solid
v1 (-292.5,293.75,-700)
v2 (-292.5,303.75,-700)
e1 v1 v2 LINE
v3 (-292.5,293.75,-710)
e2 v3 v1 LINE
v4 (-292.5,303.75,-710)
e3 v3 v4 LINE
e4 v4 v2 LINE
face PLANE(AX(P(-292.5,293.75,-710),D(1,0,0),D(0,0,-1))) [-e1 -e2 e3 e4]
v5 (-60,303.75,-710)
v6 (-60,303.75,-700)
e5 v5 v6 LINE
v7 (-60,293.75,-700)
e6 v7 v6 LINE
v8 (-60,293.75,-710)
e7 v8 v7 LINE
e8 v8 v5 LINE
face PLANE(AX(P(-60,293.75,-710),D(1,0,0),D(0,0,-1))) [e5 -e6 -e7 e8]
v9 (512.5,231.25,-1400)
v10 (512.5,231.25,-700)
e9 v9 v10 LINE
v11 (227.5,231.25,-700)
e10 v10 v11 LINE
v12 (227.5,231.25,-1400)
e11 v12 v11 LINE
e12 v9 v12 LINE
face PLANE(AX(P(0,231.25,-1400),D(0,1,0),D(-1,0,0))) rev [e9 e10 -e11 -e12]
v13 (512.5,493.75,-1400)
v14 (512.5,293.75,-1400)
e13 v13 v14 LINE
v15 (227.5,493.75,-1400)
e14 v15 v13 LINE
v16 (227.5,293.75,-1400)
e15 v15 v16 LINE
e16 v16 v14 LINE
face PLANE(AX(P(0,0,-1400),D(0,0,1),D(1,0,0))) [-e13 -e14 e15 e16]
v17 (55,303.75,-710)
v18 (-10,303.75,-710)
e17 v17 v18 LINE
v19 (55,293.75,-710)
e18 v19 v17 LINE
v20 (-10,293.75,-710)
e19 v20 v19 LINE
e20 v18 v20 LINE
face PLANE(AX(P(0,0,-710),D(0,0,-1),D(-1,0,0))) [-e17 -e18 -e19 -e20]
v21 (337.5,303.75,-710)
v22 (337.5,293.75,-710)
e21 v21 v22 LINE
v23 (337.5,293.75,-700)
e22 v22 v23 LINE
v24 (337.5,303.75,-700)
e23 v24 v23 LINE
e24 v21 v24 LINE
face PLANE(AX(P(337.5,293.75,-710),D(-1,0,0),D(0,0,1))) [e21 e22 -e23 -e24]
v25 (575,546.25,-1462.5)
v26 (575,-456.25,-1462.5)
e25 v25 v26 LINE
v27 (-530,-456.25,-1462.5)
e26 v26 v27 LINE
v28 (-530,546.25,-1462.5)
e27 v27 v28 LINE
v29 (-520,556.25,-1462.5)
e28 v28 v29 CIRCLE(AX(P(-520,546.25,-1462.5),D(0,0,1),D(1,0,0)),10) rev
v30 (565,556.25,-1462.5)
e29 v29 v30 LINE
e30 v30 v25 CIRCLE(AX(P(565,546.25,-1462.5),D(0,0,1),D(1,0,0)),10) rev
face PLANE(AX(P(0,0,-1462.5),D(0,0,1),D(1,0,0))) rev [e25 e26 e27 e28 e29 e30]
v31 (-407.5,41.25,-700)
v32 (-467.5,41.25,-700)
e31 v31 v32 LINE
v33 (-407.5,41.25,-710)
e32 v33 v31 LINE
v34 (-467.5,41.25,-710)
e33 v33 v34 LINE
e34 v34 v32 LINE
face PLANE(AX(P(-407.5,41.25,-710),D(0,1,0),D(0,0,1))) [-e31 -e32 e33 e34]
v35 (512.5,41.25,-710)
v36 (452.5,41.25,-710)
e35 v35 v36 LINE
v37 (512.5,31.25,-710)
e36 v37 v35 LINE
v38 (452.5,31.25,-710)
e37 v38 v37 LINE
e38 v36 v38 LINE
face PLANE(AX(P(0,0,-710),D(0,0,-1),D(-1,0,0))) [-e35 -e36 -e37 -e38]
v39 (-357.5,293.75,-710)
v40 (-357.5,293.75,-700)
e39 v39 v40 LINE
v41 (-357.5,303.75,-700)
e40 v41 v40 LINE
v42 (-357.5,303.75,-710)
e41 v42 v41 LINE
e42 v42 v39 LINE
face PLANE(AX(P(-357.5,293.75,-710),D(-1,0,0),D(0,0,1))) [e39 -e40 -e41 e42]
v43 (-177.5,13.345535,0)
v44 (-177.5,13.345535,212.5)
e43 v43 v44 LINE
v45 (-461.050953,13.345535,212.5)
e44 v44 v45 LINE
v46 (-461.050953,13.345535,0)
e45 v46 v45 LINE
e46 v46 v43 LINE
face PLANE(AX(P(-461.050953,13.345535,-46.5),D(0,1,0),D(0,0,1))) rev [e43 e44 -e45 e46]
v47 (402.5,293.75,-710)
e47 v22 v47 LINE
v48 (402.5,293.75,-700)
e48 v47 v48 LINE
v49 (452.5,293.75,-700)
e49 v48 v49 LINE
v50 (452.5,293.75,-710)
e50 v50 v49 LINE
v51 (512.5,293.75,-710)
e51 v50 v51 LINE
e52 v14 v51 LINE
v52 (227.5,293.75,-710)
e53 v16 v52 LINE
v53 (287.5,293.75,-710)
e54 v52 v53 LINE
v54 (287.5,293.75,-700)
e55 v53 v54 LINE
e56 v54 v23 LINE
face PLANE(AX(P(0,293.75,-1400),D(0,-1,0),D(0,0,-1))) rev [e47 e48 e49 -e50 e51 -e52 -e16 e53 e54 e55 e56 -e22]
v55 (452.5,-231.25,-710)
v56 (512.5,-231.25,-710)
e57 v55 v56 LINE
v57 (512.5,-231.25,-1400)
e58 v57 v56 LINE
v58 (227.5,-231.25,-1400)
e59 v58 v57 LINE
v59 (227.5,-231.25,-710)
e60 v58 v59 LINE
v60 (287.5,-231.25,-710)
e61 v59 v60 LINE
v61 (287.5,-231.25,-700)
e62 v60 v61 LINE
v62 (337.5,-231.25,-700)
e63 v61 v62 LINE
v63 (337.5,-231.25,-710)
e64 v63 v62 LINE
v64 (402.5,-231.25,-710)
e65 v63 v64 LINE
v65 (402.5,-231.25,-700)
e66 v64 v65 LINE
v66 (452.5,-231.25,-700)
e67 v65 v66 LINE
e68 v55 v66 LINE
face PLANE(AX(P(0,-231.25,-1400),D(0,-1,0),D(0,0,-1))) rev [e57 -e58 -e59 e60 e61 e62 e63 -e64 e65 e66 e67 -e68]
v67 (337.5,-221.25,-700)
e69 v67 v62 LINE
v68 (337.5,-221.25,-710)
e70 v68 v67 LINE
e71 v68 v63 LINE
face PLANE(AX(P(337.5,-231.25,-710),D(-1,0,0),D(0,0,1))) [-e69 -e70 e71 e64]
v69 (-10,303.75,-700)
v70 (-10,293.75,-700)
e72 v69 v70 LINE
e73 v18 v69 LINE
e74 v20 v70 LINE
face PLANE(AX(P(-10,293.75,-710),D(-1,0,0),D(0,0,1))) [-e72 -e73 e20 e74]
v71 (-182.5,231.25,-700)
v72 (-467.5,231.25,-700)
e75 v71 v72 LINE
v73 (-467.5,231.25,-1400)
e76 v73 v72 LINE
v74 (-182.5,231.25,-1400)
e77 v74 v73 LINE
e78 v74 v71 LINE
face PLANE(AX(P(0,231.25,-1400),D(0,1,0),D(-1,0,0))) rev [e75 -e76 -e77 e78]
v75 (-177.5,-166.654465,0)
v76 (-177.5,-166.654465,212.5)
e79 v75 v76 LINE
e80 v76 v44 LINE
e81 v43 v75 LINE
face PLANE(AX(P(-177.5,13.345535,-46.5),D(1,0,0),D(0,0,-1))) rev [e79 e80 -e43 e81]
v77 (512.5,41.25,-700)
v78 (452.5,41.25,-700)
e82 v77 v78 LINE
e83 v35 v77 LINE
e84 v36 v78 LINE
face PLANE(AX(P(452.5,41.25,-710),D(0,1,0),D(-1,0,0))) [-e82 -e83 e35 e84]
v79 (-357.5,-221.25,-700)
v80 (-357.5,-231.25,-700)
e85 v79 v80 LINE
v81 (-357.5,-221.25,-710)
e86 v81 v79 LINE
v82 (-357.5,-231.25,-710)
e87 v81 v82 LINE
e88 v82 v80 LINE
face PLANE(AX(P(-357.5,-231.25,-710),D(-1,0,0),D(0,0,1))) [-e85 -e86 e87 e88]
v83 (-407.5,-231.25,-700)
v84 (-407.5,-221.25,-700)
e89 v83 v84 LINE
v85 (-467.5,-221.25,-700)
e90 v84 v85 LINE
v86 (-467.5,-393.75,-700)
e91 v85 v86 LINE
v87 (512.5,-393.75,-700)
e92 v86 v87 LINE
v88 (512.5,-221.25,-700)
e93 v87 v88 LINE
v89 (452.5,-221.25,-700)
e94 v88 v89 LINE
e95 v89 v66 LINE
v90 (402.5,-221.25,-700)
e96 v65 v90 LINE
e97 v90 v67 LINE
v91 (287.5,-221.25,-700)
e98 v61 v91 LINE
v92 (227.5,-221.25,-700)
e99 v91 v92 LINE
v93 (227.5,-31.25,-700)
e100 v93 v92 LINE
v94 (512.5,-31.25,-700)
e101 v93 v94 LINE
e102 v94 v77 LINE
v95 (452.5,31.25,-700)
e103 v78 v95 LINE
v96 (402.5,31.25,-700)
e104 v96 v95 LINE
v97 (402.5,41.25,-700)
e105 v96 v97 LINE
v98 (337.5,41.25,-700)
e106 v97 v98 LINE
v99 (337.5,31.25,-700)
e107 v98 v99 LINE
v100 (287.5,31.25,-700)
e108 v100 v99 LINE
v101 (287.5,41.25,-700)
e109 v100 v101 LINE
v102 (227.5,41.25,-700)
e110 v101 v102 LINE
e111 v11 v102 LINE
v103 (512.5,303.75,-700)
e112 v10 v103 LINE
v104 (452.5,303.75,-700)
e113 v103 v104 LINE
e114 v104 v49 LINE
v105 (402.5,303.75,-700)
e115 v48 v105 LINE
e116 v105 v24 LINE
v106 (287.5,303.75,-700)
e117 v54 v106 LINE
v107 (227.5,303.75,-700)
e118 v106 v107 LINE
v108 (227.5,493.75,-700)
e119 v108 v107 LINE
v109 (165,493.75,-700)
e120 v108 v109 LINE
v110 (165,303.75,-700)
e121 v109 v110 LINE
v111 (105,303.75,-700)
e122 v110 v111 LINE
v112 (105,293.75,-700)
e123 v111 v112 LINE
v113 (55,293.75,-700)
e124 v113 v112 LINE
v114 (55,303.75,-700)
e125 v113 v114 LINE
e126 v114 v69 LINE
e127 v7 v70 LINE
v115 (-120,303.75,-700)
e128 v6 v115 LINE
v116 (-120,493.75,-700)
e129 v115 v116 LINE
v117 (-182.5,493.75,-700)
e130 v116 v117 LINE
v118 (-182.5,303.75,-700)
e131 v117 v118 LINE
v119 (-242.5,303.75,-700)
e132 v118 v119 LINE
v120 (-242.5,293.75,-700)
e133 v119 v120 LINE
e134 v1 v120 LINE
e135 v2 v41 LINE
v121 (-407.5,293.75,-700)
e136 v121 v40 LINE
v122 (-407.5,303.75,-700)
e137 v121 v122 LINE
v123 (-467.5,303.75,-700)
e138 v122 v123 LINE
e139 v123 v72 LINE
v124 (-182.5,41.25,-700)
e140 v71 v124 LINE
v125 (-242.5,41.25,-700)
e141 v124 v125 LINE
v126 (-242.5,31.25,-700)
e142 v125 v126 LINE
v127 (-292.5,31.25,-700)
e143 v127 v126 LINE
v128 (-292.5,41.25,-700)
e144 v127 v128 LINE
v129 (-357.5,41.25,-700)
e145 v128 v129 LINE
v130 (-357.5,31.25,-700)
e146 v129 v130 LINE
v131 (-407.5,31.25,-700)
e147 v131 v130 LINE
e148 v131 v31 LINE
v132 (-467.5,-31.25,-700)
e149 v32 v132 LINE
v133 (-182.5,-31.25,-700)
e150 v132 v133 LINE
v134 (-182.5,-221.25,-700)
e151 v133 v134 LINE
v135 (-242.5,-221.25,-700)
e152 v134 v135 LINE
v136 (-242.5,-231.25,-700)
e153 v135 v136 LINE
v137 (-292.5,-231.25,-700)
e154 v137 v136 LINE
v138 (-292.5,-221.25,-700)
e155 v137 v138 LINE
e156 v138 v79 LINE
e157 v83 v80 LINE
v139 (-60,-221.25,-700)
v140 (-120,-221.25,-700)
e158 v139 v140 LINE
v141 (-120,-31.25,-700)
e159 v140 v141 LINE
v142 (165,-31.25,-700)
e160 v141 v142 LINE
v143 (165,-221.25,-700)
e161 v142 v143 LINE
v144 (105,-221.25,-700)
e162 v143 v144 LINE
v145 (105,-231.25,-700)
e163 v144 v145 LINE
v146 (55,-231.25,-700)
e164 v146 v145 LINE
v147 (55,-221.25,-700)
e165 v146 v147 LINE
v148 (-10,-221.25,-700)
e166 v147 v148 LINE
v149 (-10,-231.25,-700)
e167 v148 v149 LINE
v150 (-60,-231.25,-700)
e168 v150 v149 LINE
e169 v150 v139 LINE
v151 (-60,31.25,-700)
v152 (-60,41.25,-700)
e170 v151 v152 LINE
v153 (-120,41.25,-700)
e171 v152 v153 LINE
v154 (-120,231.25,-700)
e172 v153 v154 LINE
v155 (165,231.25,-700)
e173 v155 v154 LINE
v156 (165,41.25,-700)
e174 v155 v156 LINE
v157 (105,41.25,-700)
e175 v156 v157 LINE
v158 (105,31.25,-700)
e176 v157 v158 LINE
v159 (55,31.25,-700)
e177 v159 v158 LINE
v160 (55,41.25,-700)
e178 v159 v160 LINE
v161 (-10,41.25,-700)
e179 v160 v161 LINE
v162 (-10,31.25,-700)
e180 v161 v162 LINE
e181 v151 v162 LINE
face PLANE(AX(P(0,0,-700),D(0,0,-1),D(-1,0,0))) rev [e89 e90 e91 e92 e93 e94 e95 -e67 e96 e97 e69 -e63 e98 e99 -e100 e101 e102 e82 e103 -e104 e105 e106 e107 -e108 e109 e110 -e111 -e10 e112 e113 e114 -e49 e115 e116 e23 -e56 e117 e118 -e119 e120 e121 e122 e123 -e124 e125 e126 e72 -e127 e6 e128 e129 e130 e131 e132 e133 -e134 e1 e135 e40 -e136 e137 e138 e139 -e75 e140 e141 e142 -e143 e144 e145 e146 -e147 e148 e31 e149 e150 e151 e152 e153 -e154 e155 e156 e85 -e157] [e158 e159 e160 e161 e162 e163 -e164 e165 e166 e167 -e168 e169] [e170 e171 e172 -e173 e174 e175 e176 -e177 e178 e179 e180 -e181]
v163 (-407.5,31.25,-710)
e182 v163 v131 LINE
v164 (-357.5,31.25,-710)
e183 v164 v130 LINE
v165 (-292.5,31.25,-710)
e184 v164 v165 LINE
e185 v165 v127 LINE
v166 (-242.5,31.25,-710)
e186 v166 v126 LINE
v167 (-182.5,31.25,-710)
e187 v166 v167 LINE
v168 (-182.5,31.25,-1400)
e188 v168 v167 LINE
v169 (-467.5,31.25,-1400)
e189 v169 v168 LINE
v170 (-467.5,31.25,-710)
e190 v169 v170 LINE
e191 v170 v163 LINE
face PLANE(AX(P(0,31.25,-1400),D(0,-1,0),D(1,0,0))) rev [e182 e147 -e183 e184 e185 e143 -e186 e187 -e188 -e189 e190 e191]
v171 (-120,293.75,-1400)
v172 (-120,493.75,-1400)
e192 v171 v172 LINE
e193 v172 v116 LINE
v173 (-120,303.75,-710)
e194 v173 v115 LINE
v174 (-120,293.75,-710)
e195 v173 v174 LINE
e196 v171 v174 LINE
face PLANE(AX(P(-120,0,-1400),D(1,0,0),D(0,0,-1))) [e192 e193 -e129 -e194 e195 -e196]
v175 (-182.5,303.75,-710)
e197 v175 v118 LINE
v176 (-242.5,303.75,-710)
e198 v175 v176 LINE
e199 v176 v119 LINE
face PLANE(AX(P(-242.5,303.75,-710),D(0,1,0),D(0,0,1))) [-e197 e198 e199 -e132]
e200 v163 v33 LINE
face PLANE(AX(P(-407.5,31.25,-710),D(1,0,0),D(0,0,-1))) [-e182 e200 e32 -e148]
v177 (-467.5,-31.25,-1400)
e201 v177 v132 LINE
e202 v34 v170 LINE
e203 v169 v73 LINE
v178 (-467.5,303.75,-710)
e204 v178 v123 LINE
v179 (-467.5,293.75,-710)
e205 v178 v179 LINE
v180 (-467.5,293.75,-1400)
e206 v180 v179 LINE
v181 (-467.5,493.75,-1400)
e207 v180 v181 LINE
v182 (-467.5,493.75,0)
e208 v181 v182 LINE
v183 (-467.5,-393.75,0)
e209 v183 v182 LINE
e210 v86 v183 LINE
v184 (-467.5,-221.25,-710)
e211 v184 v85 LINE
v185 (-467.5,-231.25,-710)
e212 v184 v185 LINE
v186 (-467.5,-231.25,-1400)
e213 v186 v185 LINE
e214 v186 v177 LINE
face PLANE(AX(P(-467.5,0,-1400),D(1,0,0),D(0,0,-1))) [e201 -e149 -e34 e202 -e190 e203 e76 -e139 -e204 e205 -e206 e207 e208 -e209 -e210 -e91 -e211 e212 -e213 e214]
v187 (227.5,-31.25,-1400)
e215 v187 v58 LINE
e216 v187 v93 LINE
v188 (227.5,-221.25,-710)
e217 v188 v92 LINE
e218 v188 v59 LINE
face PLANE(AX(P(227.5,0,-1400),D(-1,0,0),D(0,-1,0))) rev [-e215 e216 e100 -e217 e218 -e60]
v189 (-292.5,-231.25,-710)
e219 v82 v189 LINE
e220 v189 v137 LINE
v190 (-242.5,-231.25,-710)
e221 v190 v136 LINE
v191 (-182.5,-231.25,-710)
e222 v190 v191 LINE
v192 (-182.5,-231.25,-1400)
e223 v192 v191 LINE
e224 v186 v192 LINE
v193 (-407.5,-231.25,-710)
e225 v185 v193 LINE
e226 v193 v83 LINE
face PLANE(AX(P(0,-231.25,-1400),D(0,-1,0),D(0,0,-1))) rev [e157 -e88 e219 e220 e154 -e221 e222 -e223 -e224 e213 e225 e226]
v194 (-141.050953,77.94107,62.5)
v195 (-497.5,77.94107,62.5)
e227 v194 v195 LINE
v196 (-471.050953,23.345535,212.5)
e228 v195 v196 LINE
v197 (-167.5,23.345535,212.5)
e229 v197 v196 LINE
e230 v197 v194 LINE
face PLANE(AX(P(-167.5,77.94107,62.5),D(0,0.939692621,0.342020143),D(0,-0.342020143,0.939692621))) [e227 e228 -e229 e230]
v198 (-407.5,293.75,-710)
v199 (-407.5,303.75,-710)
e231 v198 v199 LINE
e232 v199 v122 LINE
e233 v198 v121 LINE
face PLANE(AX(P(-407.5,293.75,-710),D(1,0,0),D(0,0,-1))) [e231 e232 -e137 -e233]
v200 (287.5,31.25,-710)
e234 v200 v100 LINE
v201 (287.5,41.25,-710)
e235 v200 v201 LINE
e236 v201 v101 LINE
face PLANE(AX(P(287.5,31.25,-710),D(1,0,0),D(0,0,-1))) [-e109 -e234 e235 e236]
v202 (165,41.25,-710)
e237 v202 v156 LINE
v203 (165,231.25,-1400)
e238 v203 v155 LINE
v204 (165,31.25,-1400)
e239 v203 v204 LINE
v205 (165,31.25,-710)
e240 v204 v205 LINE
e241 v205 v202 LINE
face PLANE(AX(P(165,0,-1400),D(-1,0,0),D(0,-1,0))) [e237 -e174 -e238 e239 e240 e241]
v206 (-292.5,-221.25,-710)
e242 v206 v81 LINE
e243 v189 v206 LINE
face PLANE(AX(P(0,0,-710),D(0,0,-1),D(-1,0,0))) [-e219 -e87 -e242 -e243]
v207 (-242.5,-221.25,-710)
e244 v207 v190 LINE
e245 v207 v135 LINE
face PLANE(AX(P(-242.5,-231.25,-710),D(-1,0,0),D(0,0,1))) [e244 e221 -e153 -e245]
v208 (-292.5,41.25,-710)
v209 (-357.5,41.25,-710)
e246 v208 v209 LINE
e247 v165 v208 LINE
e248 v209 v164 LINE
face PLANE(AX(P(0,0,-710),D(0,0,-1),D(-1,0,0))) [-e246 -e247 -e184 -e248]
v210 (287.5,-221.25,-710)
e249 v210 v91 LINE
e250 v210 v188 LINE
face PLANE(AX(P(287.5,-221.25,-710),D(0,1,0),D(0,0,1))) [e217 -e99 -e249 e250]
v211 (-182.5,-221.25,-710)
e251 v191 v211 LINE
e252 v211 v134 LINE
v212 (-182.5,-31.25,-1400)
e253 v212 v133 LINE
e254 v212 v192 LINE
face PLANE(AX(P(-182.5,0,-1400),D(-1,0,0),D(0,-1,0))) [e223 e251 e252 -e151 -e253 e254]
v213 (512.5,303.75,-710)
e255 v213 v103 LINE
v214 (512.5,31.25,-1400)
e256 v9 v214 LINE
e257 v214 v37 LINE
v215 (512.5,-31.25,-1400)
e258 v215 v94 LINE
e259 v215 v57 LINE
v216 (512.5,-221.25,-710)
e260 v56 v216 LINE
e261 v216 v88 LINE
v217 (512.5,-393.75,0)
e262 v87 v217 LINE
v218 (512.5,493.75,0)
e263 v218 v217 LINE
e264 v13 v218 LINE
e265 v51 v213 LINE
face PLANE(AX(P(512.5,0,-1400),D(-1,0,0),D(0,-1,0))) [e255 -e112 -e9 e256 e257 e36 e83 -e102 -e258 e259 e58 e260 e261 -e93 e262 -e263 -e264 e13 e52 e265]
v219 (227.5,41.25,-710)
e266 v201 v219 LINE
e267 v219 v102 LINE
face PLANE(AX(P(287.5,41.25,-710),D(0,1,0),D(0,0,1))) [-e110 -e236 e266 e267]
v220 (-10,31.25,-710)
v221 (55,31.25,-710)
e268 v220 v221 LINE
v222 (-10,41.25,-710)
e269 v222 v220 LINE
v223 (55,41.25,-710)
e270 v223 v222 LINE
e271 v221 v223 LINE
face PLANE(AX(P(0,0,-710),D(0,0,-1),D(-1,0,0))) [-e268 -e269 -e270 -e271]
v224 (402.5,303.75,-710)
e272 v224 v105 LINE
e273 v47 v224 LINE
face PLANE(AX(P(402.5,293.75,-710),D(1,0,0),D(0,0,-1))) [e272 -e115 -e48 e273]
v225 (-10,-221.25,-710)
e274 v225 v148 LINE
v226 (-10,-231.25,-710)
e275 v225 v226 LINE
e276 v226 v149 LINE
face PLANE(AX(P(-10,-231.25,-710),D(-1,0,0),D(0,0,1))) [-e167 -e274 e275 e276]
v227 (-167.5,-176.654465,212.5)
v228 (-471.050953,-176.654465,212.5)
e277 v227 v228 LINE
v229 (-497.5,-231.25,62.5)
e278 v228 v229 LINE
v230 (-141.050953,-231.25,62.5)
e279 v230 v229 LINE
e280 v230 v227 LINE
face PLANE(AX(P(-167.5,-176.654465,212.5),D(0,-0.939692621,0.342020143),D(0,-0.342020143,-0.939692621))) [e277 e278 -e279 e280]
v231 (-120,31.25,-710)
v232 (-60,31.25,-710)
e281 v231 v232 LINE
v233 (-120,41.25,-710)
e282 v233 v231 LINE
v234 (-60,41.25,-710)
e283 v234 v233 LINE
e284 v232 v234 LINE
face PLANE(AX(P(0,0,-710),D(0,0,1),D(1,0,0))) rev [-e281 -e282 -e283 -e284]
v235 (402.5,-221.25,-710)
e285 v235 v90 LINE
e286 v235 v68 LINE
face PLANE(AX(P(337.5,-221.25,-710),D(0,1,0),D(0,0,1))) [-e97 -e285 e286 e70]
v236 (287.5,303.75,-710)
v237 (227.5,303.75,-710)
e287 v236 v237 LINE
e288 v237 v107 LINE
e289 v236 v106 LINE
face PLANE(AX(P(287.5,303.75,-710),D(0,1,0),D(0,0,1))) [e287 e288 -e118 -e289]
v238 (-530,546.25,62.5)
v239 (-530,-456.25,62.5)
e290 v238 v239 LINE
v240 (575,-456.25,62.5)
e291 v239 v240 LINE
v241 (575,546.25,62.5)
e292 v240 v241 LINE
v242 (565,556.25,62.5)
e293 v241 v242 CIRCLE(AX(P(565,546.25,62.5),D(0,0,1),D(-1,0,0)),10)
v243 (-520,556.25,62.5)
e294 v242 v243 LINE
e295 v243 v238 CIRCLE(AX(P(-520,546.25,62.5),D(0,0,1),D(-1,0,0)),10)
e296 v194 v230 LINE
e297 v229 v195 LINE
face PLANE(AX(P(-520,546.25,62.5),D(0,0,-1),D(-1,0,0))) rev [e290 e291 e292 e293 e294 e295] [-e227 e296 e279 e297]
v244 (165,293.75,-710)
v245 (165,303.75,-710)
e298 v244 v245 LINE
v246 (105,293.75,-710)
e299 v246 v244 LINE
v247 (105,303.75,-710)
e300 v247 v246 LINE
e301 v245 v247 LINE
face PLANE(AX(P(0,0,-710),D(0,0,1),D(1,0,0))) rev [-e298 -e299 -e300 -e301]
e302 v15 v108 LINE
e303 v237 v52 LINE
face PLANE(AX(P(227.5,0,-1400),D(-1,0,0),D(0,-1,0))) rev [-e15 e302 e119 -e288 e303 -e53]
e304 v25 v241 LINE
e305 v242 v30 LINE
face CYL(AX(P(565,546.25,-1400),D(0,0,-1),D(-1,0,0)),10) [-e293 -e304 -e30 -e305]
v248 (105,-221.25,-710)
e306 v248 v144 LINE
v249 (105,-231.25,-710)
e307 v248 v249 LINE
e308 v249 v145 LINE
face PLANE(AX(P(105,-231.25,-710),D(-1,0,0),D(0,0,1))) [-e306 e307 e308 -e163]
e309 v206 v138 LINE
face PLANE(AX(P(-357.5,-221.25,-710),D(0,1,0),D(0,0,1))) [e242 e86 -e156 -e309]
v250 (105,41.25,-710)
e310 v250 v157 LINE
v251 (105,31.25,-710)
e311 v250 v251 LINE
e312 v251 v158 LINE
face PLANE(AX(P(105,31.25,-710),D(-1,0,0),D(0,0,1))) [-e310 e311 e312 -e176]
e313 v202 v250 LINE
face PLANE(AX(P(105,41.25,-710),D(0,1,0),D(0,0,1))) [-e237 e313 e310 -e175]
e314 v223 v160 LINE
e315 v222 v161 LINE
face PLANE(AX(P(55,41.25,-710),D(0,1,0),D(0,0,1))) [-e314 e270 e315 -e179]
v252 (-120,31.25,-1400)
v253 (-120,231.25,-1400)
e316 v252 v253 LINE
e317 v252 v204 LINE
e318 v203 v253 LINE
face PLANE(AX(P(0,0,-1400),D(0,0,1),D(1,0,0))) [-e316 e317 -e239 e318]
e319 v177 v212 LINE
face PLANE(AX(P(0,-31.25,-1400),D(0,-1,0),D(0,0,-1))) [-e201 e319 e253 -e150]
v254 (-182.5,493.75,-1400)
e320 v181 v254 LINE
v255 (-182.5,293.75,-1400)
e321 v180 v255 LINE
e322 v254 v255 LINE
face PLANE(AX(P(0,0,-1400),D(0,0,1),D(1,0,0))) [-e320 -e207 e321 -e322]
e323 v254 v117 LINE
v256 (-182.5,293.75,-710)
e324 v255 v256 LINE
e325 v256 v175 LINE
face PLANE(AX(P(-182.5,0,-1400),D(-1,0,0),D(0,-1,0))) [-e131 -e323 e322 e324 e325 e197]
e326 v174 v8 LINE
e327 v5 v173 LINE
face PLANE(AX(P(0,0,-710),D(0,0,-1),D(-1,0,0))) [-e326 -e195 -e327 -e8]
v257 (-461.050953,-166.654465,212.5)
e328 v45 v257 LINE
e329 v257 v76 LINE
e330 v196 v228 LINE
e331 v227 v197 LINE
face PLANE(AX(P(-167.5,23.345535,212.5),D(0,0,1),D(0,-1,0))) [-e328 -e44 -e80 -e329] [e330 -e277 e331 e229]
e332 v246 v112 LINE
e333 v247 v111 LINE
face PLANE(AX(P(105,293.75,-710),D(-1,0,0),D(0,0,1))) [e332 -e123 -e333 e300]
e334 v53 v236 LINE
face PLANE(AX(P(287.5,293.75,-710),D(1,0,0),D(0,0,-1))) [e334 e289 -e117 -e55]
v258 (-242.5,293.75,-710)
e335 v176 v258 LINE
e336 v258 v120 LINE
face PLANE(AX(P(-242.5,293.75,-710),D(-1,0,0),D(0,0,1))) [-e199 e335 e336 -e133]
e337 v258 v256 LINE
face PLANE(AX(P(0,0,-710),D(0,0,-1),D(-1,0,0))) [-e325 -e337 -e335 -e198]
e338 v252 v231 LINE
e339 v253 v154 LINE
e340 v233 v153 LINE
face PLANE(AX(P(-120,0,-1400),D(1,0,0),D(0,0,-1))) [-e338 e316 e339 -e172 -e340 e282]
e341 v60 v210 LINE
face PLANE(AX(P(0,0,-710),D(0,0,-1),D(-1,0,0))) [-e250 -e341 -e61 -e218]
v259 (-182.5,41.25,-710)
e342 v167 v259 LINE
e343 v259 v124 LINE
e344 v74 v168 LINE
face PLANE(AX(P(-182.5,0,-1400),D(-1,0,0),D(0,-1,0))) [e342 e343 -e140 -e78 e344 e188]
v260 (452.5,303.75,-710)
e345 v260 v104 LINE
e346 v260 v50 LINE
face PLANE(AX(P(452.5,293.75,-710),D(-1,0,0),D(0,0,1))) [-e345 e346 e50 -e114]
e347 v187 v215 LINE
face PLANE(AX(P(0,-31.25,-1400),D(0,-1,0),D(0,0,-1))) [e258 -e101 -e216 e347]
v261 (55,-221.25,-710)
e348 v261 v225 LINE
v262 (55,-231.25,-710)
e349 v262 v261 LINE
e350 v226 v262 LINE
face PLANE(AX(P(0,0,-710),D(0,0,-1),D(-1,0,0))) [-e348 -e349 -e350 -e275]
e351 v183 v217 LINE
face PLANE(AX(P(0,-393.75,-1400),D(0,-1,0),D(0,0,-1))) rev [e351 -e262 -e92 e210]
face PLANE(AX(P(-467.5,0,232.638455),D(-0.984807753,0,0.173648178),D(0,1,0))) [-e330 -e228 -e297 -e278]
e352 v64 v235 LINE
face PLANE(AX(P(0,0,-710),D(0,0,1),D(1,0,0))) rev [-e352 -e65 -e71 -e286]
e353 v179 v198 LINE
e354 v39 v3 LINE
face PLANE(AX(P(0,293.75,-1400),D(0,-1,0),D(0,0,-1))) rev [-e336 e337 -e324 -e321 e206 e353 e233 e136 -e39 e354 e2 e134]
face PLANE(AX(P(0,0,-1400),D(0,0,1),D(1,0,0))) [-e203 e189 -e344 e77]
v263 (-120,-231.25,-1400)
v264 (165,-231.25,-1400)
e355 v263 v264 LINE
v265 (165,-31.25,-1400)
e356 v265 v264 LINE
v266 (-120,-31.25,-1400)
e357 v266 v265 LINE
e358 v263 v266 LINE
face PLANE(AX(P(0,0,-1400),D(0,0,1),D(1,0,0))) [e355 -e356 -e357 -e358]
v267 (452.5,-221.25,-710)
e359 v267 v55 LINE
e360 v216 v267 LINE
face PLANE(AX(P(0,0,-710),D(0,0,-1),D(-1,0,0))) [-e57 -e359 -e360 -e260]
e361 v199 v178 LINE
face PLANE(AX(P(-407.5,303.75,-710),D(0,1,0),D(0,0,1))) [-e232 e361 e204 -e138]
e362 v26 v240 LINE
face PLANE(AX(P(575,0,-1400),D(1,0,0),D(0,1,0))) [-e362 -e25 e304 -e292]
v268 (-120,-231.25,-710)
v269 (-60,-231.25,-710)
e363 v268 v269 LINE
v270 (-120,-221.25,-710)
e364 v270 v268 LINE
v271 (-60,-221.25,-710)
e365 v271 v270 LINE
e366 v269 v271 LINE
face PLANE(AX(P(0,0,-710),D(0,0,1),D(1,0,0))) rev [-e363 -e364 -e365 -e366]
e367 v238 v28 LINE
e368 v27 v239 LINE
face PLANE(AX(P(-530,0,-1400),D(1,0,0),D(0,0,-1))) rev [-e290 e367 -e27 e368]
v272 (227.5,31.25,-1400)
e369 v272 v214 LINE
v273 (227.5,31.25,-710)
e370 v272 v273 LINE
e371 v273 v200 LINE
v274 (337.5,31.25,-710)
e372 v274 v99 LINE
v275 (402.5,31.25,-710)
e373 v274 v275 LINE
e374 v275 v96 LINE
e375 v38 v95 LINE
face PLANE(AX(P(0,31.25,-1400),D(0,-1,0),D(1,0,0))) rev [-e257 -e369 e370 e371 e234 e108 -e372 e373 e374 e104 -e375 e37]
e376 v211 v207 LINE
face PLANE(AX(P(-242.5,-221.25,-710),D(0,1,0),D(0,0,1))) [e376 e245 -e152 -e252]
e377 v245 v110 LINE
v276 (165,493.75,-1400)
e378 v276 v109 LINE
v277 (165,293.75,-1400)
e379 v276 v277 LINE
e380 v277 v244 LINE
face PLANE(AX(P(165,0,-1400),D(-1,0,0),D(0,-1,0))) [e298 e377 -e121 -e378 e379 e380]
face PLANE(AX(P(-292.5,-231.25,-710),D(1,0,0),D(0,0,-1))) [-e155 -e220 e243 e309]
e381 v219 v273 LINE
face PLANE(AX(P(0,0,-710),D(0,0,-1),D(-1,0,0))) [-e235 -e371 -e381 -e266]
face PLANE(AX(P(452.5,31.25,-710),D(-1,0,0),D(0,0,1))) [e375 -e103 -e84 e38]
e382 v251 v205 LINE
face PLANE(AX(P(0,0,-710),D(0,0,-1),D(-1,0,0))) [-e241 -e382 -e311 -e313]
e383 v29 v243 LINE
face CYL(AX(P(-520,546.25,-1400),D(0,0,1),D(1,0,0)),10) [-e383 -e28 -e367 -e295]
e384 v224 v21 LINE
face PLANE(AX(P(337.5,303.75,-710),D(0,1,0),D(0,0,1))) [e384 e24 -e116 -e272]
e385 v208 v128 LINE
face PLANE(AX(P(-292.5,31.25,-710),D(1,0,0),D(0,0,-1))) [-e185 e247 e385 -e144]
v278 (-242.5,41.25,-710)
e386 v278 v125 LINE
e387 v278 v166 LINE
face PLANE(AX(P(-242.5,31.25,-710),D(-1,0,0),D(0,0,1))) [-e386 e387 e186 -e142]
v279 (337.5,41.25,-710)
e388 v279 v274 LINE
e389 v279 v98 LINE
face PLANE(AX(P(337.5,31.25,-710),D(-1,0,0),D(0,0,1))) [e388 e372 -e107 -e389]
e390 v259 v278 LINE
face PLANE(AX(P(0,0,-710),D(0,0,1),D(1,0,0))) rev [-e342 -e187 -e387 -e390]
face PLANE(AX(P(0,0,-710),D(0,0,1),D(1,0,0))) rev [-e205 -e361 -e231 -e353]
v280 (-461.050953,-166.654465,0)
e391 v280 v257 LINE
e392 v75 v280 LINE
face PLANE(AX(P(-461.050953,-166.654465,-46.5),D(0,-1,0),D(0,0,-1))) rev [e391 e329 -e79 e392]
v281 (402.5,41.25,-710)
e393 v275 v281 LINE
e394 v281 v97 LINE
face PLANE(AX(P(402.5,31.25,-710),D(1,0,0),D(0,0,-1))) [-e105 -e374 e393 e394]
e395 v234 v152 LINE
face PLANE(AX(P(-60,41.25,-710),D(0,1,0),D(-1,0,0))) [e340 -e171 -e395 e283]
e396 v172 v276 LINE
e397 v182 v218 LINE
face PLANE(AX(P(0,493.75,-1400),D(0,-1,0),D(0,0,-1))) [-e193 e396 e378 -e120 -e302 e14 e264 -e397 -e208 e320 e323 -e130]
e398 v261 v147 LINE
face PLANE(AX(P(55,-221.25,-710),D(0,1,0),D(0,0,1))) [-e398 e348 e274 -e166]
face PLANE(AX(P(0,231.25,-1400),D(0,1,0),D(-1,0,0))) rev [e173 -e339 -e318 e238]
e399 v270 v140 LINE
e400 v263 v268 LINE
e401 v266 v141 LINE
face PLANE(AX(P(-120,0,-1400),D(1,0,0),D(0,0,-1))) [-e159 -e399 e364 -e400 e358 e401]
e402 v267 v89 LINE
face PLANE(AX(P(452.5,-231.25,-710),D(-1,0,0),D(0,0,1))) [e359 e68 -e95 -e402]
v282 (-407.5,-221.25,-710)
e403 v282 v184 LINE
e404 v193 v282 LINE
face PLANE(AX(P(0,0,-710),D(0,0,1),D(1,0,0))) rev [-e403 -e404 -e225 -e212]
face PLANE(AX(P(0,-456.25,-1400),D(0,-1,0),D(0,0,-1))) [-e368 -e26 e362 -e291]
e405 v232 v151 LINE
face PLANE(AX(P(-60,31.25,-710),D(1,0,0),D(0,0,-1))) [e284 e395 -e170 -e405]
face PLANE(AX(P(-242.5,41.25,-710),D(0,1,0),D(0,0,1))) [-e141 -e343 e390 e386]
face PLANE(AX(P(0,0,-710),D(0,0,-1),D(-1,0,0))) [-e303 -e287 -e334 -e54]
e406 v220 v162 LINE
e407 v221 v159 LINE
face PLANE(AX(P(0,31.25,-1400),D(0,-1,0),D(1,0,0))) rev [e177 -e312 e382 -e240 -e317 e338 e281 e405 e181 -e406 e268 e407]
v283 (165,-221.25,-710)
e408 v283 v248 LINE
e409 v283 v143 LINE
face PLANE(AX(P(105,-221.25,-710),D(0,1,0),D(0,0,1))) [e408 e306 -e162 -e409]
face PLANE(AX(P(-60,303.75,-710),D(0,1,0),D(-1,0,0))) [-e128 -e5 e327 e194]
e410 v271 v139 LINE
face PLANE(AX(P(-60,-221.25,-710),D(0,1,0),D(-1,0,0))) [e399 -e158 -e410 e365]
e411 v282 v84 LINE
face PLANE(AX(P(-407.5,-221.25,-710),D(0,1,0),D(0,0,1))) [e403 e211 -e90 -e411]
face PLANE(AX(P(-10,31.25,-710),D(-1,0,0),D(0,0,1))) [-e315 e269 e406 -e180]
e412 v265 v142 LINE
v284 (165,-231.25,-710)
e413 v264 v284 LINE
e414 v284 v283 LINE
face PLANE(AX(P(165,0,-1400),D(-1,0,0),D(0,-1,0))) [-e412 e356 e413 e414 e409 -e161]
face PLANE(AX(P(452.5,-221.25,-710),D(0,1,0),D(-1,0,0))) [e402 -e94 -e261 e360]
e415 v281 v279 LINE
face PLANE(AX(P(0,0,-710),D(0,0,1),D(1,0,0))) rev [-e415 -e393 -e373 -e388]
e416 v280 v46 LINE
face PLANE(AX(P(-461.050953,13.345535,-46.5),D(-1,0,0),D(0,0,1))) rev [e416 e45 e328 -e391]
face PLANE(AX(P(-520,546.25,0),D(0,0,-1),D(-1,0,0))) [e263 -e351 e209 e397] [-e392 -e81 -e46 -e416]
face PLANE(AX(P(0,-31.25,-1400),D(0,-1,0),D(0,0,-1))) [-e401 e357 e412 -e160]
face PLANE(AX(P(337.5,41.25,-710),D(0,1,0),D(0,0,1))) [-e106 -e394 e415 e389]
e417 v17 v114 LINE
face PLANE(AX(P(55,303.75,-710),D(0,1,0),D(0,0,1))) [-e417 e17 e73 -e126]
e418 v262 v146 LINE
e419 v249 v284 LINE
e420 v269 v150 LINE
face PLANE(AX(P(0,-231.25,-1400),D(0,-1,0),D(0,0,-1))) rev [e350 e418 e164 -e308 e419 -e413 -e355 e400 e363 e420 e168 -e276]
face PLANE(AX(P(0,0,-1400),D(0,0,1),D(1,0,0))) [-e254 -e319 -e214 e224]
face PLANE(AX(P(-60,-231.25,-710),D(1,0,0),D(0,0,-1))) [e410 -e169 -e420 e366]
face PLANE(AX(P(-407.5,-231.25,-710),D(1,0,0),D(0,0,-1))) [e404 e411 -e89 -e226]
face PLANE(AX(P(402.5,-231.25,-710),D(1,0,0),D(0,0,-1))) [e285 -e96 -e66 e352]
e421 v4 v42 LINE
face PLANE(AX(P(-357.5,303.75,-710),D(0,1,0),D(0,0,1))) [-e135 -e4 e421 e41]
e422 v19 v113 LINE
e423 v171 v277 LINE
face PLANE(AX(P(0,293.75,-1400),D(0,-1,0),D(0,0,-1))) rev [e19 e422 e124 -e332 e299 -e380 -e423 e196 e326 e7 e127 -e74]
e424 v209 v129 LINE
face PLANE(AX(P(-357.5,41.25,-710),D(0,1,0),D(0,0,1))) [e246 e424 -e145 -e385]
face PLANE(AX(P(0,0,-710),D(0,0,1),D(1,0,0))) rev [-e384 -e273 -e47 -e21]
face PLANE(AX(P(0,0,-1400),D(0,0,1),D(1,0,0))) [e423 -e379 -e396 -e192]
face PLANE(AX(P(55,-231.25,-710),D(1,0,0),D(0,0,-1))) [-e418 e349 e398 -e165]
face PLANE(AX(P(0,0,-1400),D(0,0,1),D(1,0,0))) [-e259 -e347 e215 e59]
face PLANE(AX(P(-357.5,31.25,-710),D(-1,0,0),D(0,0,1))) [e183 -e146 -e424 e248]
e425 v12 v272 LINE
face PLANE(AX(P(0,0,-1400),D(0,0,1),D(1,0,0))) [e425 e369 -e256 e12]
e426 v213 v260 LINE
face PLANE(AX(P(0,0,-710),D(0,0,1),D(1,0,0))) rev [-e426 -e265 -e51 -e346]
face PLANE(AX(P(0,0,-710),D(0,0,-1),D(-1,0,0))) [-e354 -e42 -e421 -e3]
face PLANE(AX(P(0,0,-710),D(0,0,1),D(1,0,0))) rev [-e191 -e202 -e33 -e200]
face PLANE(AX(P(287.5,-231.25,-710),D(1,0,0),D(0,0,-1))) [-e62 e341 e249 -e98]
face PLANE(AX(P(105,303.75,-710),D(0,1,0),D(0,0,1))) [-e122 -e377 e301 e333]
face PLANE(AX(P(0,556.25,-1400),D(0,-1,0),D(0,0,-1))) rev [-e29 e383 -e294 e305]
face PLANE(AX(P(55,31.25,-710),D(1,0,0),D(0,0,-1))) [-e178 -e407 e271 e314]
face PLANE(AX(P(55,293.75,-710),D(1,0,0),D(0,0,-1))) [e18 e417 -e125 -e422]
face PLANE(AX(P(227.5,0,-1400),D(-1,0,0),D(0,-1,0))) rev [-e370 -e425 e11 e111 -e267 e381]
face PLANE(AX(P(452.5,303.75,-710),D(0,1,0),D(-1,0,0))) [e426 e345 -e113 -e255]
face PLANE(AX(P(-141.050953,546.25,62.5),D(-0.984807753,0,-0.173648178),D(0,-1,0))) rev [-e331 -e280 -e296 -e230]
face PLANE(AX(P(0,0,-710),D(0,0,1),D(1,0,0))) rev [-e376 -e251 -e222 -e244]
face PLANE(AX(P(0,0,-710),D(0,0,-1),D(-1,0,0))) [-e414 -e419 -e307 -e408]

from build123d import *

# Parameters (mm, degrees)
SKETCH1_W           = 1105
SKETCH1_H           = 1012.5
SKETCH1_W_2         = 285
SKETCH1_H_2         = 200
SKETCH1_W_3         = 980
SKETCH1_H_3         = 100
BOSS_EXTRUDE1_DEPTH = 1400
SKETCH2_W           = 1105
SKETCH2_H           = 1012.5
BOSS_EXTRUDE3_DEPTH = 62.5
SKETCH3_W           = 980
SKETCH3_H           = 887.5
CUT_EXTRUDE1_DEPTH  = 700
BOSS_EXTRUDE4_REACH = 1107.19
SKETCH5_W           = 980
SKETCH5_H           = 100
SKETCH4_W           = 65
SKETCH4_H           = 10
SKETCH4_W_2         = 60
BOSS_EXTRUDE5_DEPTH = 10
FILLET1_R           = 10
BOSS_EXTRUDE6_START = 62.5
BOSS_EXTRUDE6_DEPTH = 62.5
BOSS_EXTRUDE7_START = -62.5
BOSS_EXTRUDE7_DEPTH = 300
CHAMFER3_SIZE2      = 150
CHAMFER3_SIZE       = 26.449047106
CHAMFER4_SIZE       = 30
CHAMFER4_SIZE_2     = 170.138454589
SKETCH14_W          = 283.550952894
SKETCH14_H          = 180
CUT_EXTRUDE4_DEPTH  = 259


# Some blends are built 0.0001 mm under size
with BuildPart() as part:
    # Sketch1 → Boss-Extrude1 (new body)
    with BuildSketch(Plane.XY):
        with Locations((22.5, 50)):
            Rectangle(SKETCH1_W, SKETCH1_H)
        with Locations((370, 131.25)):
            Rectangle(SKETCH1_W_2, SKETCH1_H_2, mode=Mode.SUBTRACT)
        with Locations((370, 393.75)):
            Rectangle(SKETCH1_W_2, SKETCH1_H_2, mode=Mode.SUBTRACT)
        with Locations((22.5, 393.75)):
            Rectangle(SKETCH1_W_2, SKETCH1_H_2, mode=Mode.SUBTRACT)
        with Locations((-325, 393.75)):
            Rectangle(SKETCH1_W_2, SKETCH1_H_2, mode=Mode.SUBTRACT)
        with Locations((-325, 131.25)):
            Rectangle(SKETCH1_W_2, SKETCH1_H_2, mode=Mode.SUBTRACT)
        with Locations((-325, -131.25)):
            Rectangle(SKETCH1_W_2, SKETCH1_H_2, mode=Mode.SUBTRACT)
        with Locations((22.5, -343.75)):
            Rectangle(SKETCH1_W_3, SKETCH1_H_3, mode=Mode.SUBTRACT)
        with Locations((370, -131.25)):
            Rectangle(SKETCH1_W_2, SKETCH1_H_2, mode=Mode.SUBTRACT)
        with Locations((22.5, -131.25)):
            Rectangle(SKETCH1_W_2, SKETCH1_H_2, mode=Mode.SUBTRACT)
        with Locations((22.5, 131.25)):
            Rectangle(SKETCH1_W_2, SKETCH1_H_2, mode=Mode.SUBTRACT)
    extrude(amount=-BOSS_EXTRUDE1_DEPTH)

    # Sketch2 → Boss-Extrude3 (add)
    with BuildSketch(Plane(origin=(0, 0, -1400), x_dir=(-1, 0, 0), z_dir=(0, 0, -1))):
        with Locations((-22.5, 50)):
            Rectangle(SKETCH2_W, SKETCH2_H)
    extrude(amount=BOSS_EXTRUDE3_DEPTH)

    # Sketch3 → Cut-Extrude1 (cut)
    with BuildSketch(Plane.XY):
        with Locations((22.5, 50)):
            Rectangle(SKETCH3_W, SKETCH3_H)
    extrude(amount=-CUT_EXTRUDE1_DEPTH, mode=Mode.SUBTRACT)

    # Sketch5 → Boss-Extrude4 (add, up to next)
    with BuildSketch(Plane.XY.offset(-700), mode=Mode.PRIVATE) as boss_extrude4_sk1:
        with Locations((22.5, -343.75)):
            Rectangle(SKETCH5_W, SKETCH5_H)
    boss_extrude4_tool1 = extrude(boss_extrude4_sk1.sketch, amount=-BOSS_EXTRUDE4_REACH, mode=Mode.PRIVATE) - part.part
    add(boss_extrude4_tool1.solids().sort_by_distance((22.5, -343.75, -700))[0])

    # Sketch4 → Boss-Extrude5 (add)
    with BuildSketch(Plane.XY.offset(-700)):
        with Locations((-325, 298.75)):
            Rectangle(SKETCH4_W, SKETCH4_H)
        with Locations((-437.5, 298.75)):
            Rectangle(SKETCH4_W_2, SKETCH4_H)
        with Locations((-212.5, 298.75)):
            Rectangle(SKETCH4_W_2, SKETCH4_H)
        with Locations((-90, 298.75)):
            Rectangle(SKETCH4_W_2, SKETCH4_H)
        with Locations((22.5, 298.75)):
            Rectangle(SKETCH4_W, SKETCH4_H)
        with Locations((135, 298.75)):
            Rectangle(SKETCH4_W_2, SKETCH4_H)
        with Locations((257.5, 298.75)):
            Rectangle(SKETCH4_W_2, SKETCH4_H)
        with Locations((370, 298.75)):
            Rectangle(SKETCH4_W, SKETCH4_H)
        with Locations((482.5, 298.75)):
            Rectangle(SKETCH4_W_2, SKETCH4_H)
        with Locations((-437.5, 36.25)):
            Rectangle(SKETCH4_W_2, SKETCH4_H)
        with Locations((-325, 36.25)):
            Rectangle(SKETCH4_W, SKETCH4_H)
        with Locations((-212.5, 36.25)):
            Rectangle(SKETCH4_W_2, SKETCH4_H)
        with Locations((-90, 36.25)):
            Rectangle(SKETCH4_W_2, SKETCH4_H)
        with Locations((22.5, 36.25)):
            Rectangle(SKETCH4_W, SKETCH4_H)
        with Locations((135, 36.25)):
            Rectangle(SKETCH4_W_2, SKETCH4_H)
        with Locations((257.5, 36.25)):
            Rectangle(SKETCH4_W_2, SKETCH4_H)
        with Locations((370, 36.25)):
            Rectangle(SKETCH4_W, SKETCH4_H)
        with Locations((482.5, 36.25)):
            Rectangle(SKETCH4_W_2, SKETCH4_H)
        with Locations((-437.5, -226.25)):
            Rectangle(SKETCH4_W_2, SKETCH4_H)
        with Locations((-325, -226.25)):
            Rectangle(SKETCH4_W, SKETCH4_H)
        with Locations((-212.5, -226.25)):
            Rectangle(SKETCH4_W_2, SKETCH4_H)
        with Locations((-90, -226.25)):
            Rectangle(SKETCH4_W_2, SKETCH4_H)
        with Locations((22.5, -226.25)):
            Rectangle(SKETCH4_W, SKETCH4_H)
        with Locations((135, -226.25)):
            Rectangle(SKETCH4_W_2, SKETCH4_H)
        with Locations((257.5, -226.25)):
            Rectangle(SKETCH4_W_2, SKETCH4_H)
        with Locations((370, -226.25)):
            Rectangle(SKETCH4_W, SKETCH4_H)
        with Locations((482.5, -226.25)):
            Rectangle(SKETCH4_W_2, SKETCH4_H)
    extrude(amount=-BOSS_EXTRUDE5_DEPTH)

    # Fillet1
    fillet1_edges = [part.edges().sort_by_distance(p)[0] for p in [
        (-530, 556.25, -731.25),
        (575, 556.25, -731.25),
    ]]
    fillet(fillet1_edges, radius=FILLET1_R)

    # Sketch6 → Boss-Extrude6 (add)
    with BuildSketch(Plane.XY.offset(BOSS_EXTRUDE6_START)):
        with BuildLine():
            Line((-530, -456.25), (575, -456.25))
            Line((575, -456.25), (575, 546.25))
            ThreePointArc((575, 546.25), (572.071067812, 553.321067812), (565, 556.25))
            Line((565, 556.25), (-520, 556.25))
            ThreePointArc((-520, 556.25), (-527.071067812, 553.321067812), (-530, 546.25))
            Line((-530, 546.25), (-530, -456.25))
        make_face()
    extrude(amount=-BOSS_EXTRUDE6_DEPTH)

    # Sketch8 → Boss-Extrude7 (add)
    with BuildSketch(Plane.ZY.offset(530).offset(BOSS_EXTRUDE7_START)):
        Polygon((62.5, 77.94107028), (212.5, 23.34553514), (212.5, -176.65446486), (62.5, -231.25), align=None)
    extrude(amount=-BOSS_EXTRUDE7_DEPTH)

    # Chamfer3
    chamfer3_edges = [part.edges().sort_by_distance(p)[0] for p in [
        (-167.5, -76.65446486, 62.5),
    ]]
    chamfer3_side = [part.faces().sort_by_distance(p)[0] for p in [
        (-166.971019058, -76.65446486, 62.5),
    ]]
    chamfer(chamfer3_edges, length=CHAMFER3_SIZE - 0.0001, length2=CHAMFER3_SIZE2 - 0.0001, reference=chamfer3_side[0])  # a hair under: the kernel refuses the full size

    # Chamfer4
    # the kernel refuses this chamfer: 170.138454589, 30 mm, written as the material it adds along each edge
    with BuildSketch(Plane(origin=(-467.5, -673.361375011, 62.5), x_dir=(-0.9776715712462578, 0, -0.21013876076743535), z_dir=(0, 1, 0))) as chamfer4_piece_1_section:
        Polygon((CHAMFER4_SIZE * 0.977671571246, CHAMFER4_SIZE * 0.210138760767), (-CHAMFER4_SIZE_2 * 0.210138760767, CHAMFER4_SIZE_2 * 0.977671571244), (0, 0), align=None)
    chamfer4_piece_1 = extrude(amount=1193.413820303, mode=Mode.PRIVATE)
    chamfer4_piece_1 = split(chamfer4_piece_1, bisect_by=Plane(origin=(-476.496724396, -196.562071995, 157.804298923), z_dir=(0, 0.9396926207859072, -0.34202014332567215)), keep=Keep.TOP, mode=Mode.PRIVATE)
    chamfer4_piece_1 = split(chamfer4_piece_1, bisect_by=Plane(origin=(-476.496724396, 43.253142274, 157.804298923), z_dir=(0, -0.9396926207859073, -0.3420201433256722)), keep=Keep.TOP, mode=Mode.PRIVATE)
    chamfer4_piece_1 = split(chamfer4_piece_1, bisect_by=Plane(origin=(-476.496724396, -76.65446486, 212.5), z_dir=(0, 0, -1)), keep=Keep.TOP, mode=Mode.PRIVATE)
    add(chamfer4_piece_1)

    # Sketch14 → Cut-Extrude4 (cut)
    with BuildSketch(Plane.XY.offset(212.5)):
        with Locations((-319.275476447, -76.65446486)):
            Rectangle(SKETCH14_W, SKETCH14_H)
    extrude(amount=-CUT_EXTRUDE4_DEPTH, mode=Mode.SUBTRACT)


solid = part.part
